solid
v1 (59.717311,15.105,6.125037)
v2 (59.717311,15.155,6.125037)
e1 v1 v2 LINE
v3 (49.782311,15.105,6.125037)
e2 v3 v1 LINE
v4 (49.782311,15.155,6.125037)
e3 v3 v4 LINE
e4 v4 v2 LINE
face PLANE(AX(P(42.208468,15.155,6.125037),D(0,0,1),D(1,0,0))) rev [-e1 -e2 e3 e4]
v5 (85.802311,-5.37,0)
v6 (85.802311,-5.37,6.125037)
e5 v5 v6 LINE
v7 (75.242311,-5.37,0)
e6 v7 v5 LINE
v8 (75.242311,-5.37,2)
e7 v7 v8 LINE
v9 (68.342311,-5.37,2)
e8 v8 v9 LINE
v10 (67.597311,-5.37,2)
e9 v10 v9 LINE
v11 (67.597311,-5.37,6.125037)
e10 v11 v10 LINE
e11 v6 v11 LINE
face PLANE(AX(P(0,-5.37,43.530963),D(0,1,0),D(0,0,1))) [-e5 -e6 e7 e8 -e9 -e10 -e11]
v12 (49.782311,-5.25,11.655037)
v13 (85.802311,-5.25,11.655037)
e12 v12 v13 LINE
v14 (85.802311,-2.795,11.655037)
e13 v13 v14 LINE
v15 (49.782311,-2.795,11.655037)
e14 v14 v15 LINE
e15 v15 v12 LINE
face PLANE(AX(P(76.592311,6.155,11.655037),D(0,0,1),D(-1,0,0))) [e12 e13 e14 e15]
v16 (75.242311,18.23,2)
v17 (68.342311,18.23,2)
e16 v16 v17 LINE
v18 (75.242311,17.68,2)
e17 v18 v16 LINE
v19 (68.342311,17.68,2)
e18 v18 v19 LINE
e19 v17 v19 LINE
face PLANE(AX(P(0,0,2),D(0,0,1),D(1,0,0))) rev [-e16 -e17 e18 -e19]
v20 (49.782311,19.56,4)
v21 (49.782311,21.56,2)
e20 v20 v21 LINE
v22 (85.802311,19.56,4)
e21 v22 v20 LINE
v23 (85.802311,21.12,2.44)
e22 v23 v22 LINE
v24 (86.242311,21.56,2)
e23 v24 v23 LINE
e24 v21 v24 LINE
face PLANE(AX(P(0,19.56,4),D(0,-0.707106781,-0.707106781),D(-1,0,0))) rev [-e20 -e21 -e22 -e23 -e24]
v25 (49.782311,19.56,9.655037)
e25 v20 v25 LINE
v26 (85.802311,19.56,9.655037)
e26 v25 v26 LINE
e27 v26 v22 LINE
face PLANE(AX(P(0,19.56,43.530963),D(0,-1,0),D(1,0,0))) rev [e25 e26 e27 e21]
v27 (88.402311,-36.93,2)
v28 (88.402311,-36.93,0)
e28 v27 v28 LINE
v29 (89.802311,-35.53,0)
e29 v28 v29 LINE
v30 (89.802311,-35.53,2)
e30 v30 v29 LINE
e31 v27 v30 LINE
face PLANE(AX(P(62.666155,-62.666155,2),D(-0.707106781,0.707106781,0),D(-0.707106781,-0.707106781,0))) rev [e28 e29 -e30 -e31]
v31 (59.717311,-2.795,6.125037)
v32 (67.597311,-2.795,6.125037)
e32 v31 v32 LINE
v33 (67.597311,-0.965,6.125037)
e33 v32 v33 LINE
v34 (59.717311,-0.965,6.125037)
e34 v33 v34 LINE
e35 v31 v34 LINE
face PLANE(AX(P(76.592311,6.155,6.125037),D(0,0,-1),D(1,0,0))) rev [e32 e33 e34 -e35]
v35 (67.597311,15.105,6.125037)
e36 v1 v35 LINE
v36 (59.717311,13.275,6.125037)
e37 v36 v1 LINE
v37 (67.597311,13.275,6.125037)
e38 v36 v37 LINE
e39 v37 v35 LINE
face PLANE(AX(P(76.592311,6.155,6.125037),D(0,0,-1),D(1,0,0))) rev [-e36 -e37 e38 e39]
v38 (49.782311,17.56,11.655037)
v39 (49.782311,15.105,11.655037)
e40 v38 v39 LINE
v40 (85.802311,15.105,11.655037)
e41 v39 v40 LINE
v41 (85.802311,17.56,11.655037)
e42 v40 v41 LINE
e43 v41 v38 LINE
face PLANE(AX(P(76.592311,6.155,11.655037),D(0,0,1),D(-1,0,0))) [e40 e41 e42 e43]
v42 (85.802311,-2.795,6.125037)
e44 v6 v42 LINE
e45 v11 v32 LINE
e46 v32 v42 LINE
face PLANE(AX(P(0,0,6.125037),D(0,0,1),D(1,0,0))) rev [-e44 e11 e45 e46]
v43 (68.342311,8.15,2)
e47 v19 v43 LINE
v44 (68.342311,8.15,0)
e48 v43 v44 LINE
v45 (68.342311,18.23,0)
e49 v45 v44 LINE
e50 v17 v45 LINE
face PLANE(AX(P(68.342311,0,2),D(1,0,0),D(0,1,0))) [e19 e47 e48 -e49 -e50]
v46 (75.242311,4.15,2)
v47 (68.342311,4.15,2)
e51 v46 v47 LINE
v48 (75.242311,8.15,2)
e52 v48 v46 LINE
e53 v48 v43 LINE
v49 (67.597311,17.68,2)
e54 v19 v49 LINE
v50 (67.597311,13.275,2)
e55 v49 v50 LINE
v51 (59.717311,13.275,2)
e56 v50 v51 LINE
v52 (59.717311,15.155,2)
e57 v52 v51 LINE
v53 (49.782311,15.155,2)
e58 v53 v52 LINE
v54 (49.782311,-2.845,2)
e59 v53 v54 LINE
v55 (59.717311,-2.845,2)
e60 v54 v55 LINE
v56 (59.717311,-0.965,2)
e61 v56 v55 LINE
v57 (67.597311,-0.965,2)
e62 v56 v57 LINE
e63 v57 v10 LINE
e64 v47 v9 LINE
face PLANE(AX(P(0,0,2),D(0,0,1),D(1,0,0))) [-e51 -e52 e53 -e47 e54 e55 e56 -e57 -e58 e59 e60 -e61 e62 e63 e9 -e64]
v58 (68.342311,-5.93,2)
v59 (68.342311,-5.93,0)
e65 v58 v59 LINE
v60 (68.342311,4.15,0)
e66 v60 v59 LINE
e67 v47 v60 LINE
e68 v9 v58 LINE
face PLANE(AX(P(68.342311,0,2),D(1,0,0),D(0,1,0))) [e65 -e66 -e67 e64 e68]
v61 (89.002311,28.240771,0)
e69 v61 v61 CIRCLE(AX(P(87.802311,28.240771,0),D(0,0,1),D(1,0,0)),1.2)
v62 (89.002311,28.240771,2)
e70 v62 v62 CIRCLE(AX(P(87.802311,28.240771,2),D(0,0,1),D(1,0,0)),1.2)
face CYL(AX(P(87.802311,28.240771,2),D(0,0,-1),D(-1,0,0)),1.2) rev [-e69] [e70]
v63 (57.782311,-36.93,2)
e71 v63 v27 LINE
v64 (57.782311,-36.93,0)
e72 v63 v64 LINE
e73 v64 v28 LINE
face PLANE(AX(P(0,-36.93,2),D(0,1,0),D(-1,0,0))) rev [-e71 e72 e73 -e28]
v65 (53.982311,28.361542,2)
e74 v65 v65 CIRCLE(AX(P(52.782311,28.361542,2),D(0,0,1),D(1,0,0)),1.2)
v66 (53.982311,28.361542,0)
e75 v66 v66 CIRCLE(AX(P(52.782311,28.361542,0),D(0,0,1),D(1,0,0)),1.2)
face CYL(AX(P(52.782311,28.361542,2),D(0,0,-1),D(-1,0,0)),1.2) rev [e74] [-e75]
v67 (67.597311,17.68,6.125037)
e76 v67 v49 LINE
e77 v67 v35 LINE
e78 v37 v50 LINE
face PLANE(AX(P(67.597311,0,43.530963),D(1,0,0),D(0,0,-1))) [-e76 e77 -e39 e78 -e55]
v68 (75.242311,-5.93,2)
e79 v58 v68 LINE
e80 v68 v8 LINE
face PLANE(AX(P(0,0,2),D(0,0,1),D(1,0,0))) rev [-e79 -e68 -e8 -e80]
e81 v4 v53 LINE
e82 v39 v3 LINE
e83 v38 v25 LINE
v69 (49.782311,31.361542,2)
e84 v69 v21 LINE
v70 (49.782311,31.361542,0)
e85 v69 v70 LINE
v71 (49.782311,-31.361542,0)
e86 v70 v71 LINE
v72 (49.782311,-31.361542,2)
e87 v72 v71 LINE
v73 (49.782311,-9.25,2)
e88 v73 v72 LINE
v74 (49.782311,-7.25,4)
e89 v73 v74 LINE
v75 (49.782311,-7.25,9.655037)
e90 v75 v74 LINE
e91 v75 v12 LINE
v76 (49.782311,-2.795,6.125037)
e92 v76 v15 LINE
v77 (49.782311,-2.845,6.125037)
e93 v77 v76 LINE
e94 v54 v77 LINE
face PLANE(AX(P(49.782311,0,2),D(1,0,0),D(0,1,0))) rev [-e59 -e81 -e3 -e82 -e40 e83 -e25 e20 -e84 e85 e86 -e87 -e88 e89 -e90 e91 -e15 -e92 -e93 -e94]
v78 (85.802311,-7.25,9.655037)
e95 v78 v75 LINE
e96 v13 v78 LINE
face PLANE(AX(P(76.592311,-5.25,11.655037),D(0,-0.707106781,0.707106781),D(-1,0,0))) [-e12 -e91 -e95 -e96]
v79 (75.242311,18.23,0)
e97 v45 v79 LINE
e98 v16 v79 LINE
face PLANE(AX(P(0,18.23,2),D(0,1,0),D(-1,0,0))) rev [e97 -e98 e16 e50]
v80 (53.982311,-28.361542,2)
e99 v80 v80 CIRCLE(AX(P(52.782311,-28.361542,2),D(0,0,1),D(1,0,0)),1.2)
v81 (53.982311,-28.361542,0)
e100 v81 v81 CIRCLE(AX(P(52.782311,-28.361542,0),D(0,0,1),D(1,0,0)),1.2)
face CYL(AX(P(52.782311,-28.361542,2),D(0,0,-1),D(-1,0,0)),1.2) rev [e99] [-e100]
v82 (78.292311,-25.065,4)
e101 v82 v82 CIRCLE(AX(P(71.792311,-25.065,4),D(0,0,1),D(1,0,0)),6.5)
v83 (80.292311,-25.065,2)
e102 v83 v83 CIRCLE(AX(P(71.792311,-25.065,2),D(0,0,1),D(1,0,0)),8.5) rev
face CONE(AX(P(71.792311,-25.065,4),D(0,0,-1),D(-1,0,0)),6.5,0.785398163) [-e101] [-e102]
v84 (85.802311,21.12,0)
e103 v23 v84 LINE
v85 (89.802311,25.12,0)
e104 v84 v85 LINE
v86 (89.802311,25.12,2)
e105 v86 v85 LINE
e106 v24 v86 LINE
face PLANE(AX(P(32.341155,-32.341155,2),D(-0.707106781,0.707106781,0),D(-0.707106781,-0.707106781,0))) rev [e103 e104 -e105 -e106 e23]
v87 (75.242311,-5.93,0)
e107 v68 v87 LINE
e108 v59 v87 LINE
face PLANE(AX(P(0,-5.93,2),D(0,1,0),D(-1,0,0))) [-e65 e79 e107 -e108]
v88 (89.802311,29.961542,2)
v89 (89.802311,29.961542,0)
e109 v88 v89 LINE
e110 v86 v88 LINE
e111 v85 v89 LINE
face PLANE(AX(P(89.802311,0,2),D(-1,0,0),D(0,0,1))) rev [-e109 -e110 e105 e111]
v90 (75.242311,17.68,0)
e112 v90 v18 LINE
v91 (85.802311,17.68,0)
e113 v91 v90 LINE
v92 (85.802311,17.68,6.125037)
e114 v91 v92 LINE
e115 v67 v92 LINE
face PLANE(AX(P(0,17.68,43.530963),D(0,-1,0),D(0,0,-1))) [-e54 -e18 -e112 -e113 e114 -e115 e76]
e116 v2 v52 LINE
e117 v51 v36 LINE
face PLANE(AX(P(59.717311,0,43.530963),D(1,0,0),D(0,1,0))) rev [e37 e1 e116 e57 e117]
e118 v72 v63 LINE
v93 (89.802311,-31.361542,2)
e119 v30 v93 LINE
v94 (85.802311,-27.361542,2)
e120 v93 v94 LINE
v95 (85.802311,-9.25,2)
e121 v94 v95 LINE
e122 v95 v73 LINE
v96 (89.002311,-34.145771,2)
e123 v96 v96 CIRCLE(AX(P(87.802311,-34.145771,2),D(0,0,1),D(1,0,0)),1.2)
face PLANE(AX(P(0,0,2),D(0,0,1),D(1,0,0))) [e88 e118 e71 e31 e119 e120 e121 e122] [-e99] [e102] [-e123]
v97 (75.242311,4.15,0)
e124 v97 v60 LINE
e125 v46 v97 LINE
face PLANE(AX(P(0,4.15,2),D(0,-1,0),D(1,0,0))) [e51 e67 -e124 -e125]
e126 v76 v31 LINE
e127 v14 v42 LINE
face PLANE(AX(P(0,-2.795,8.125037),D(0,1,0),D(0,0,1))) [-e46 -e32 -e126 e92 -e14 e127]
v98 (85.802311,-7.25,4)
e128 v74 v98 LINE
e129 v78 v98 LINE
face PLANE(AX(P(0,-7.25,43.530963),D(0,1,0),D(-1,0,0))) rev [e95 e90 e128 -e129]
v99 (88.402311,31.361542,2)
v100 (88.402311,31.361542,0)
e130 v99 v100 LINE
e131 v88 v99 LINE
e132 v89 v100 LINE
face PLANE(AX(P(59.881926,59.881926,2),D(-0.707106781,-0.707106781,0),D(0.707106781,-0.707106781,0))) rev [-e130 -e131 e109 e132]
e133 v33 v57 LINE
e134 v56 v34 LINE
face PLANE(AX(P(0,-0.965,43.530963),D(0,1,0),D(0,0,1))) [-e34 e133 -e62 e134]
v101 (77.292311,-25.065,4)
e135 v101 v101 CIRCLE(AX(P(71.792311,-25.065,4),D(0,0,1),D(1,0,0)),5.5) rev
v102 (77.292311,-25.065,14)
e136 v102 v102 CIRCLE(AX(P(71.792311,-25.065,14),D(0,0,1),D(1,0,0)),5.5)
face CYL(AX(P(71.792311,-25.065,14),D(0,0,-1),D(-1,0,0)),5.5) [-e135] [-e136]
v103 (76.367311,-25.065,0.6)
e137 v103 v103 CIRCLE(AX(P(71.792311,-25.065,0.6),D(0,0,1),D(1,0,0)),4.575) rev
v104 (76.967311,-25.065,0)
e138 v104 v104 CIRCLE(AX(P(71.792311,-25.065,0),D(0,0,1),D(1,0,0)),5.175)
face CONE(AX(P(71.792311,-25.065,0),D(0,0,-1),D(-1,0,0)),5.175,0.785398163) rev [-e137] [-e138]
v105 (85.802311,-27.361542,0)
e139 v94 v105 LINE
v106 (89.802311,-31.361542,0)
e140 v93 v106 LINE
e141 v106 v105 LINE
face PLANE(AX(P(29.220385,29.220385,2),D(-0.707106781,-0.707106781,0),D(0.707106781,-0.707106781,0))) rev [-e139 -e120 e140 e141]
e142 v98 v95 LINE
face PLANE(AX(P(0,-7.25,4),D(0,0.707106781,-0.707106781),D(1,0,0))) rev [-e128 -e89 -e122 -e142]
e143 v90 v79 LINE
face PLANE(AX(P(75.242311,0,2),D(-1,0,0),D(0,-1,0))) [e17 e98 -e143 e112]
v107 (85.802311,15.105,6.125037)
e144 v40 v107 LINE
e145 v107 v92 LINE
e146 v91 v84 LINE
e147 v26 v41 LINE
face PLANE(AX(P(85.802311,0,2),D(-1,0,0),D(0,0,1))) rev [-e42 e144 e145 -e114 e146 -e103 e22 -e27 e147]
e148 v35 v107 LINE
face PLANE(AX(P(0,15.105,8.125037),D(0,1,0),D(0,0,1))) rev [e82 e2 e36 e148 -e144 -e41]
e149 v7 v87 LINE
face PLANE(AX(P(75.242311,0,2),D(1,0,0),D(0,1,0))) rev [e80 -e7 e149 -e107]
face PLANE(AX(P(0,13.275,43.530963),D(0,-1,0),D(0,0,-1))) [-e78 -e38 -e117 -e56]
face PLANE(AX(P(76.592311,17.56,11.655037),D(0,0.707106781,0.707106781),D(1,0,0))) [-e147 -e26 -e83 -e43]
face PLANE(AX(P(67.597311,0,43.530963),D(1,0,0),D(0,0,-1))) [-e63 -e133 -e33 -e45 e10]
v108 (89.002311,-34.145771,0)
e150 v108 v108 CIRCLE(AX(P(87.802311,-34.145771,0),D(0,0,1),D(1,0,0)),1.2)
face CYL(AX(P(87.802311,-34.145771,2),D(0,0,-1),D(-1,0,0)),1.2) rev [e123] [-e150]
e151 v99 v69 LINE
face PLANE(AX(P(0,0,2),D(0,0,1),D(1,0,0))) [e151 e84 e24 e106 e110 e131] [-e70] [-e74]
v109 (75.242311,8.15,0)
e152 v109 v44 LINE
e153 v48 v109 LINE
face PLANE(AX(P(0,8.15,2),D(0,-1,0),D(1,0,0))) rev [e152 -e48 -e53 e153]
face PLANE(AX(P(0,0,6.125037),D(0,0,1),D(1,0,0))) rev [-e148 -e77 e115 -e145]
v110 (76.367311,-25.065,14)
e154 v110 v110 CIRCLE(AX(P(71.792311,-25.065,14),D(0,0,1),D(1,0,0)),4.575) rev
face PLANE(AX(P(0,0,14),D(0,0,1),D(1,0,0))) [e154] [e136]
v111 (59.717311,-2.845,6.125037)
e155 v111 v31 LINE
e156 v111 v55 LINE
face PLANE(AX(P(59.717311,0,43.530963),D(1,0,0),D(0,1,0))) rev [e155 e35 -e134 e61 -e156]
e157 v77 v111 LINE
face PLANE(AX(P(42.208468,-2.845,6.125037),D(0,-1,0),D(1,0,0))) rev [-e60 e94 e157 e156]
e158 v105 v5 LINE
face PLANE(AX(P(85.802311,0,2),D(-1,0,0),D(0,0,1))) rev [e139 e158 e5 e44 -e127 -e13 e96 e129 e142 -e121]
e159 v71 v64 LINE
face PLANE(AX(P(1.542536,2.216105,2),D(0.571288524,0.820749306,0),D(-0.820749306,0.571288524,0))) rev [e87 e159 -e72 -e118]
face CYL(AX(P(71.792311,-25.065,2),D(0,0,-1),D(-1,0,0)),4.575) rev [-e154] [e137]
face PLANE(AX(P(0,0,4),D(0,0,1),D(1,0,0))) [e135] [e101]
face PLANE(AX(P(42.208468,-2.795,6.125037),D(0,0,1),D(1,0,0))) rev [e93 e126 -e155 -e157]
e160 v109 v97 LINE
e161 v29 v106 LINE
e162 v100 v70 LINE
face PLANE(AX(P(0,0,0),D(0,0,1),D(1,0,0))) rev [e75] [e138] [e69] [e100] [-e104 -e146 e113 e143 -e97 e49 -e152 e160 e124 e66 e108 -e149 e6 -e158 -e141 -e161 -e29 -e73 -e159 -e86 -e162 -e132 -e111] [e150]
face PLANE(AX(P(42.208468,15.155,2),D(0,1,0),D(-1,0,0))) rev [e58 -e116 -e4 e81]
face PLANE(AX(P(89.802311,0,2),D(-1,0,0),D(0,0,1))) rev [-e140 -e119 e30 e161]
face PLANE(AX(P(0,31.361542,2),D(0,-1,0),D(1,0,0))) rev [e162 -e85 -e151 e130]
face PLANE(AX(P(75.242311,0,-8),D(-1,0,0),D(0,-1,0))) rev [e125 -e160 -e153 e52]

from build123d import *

# Parameters (mm, degrees)
SKETCH_1_R          = 4.575
SKETCH_1_W          = 6.9
SKETCH_1_H          = 10.08
SKETCH_1_R_2        = 1.2
EXTRUDE_1_DEPTH     = 2
EXTRUDE_2_DEPTH     = 4.125036756
SKETCH_3_W          = 1.88
SKETCH_3_H          = 14.24
CUT_EXTRUDE_1_DEPTH = 4.125036756
SKETCH_4_W          = 6.9
SKETCH_4_H          = 0.56
SKETCH_4_H_2        = 0.55
EXTRUDE_3_DEPTH     = 4.125036756
SKETCH_5_W          = 0.215
SKETCH_5_H          = 23.05
CUT_EXTRUDE_2_DEPTH = 4.125036756
SKETCH_6_W          = 0.745
SKETCH_6_H          = 2.575
SKETCH_6_W_2        = 6.9
EXTRUDE_4_DEPTH     = 2
SKETCH_7_R          = 5.5
SKETCH_7_R_2        = 4.575
EXTRUDE_5_DEPTH     = 12
CHAMFER_1_SIZE      = 0.6
SKETCH_8_R          = 6.5
SKETCH_8_R_2        = 5.5
EXTRUDE_6_DEPTH     = 2
EXTRUDE_7_DEPTH     = 15.935
SKETCH_10_W         = 36.02
SKETCH_10_H         = 4.455
EXTRUDE_8_DEPTH     = 3.53
CHAMFER_3_SIZE      = 2
CHAMFER_4_SIZE      = 2
CUT_EXTRUDE_4_DEPTH = 10


with BuildPart() as part:
    # 草图1 → 凸台-拉伸1 (new body)
    # profile 1 of 2: a face of its own
    with BuildSketch(Plane.XY):
        Polygon((83.862310964, 7.15), (85.802310964, 7.15), (85.802310964, 13.83), (83.862310964, 13.83), (83.862310964, 25.12), (77.212310964, 25.12), (77.212310964, 30), (66.372310964, 30), (66.372310964, 25.12), (59.662310964, 25.12), (59.662310964, 25.076338502), (59.782310964, 25), (59.782310964, -34.93), (83.862310964, -34.93), align=None)
        with Locations((71.792310964, -25.065)):
            Circle(SKETCH_1_R, mode=Mode.SUBTRACT)
        with Locations((71.792310964, -0.89)):
            Rectangle(SKETCH_1_W, SKETCH_1_H, mode=Mode.SUBTRACT)
        with Locations((71.792310964, 13.19)):
            Rectangle(SKETCH_1_W, SKETCH_1_H, mode=Mode.SUBTRACT)
    # profile 2 of 2: a face of its own
    with BuildSketch(Plane.XY):
        Polygon((85.802310964, -27.361541817), (85.802310964, 7.15), (83.862310964, 7.15), (83.862310964, -34.93), (59.782310964, -34.93), (59.782310964, 25), (59.662310964, 25.076338502), (59.662310964, 25.12), (66.372310964, 25.12), (66.372310964, 30), (77.212310964, 30), (77.212310964, 25.12), (83.862310964, 25.12), (83.862310964, 13.83), (85.802310964, 13.83), (85.802310964, 21.12), (89.802310964, 25.12), (89.802310964, 29.961541817), (88.402310964, 31.361541817), (49.782310964, 31.361541817), (49.782310964, -31.361541817), (57.782310964, -36.93), (88.402310964, -36.93), (89.802310964, -35.53), (89.802310964, -31.361541817), align=None)
        with Locations((52.782310964, -28.361541817)):
            Circle(SKETCH_1_R_2, mode=Mode.SUBTRACT)
        with Locations((87.802310964, -34.145770908)):
            Circle(SKETCH_1_R_2, mode=Mode.SUBTRACT)
        with Locations((52.782310964, 28.361541817)):
            Circle(SKETCH_1_R_2, mode=Mode.SUBTRACT)
        with Locations((87.802310964, 28.240770908)):
            Circle(SKETCH_1_R_2, mode=Mode.SUBTRACT)
    extrude(amount=EXTRUDE_1_DEPTH)

    # 草图2 → 凸台-拉伸2 (add)
    with BuildSketch(Plane.XY.offset(2)):
        Polygon((79.187310964, 17.68), (79.187310964, 19.56), (65.717310964, 19.56), (65.717310964, 15.155), (59.717310964, 15.155), (59.717310964, -2.845), (65.717310964, -2.845), (65.717310964, -7.25), (79.187310964, -7.25), (79.187310964, -5.37), (75.242310964, -5.37), (75.242310964, -5.93), (68.342310964, -5.93), (68.342310964, -5.37), (67.597310964, -5.37), (67.597310964, -0.965), (61.597310964, -0.965), (61.597310964, 13.275), (67.597310964, 13.275), (67.597310964, 17.68), (68.342310964, 17.68), (68.342310964, 18.23), (75.242310964, 18.23), (75.242310964, 17.68), align=None)
        Polygon((83.187310964, 17.68), (83.187310964, 19.56), (79.187310964, 19.56), (79.187310964, 17.68), (81.067310964, 17.68), (81.307310964, 17.68), align=None)
        Polygon((85.802310964, 19.56), (83.187310964, 19.56), (83.187310964, 17.68), (85.587310964, 17.68), (85.587310964, -5.37), (83.187310964, -5.37), (83.187310964, -7.25), (85.802310964, -7.25), align=None)
        Polygon((79.187310964, -7.25), (83.187310964, -7.25), (83.187310964, -5.37), (81.307310964, -5.37), (81.067310964, -5.37), (79.187310964, -5.37), align=None)
    extrude(amount=EXTRUDE_2_DEPTH)

    # 草图3 → 切除-拉伸1 (cut)
    with BuildSketch(Plane.XY.offset(6.125036756)):
        with Locations((60.657310964, 6.155)):
            Rectangle(SKETCH_3_W, SKETCH_3_H)
    extrude(amount=-CUT_EXTRUDE_1_DEPTH, mode=Mode.SUBTRACT)

    # 草图4 → 凸台-拉伸3 (add)
    with BuildSketch(Plane.XY.offset(6.125036756)):
        with Locations((71.792310964, -5.65)):
            Rectangle(SKETCH_4_W, SKETCH_4_H)
        with Locations((71.792310964, 17.955)):
            Rectangle(SKETCH_4_W, SKETCH_4_H_2)
    extrude(amount=-EXTRUDE_3_DEPTH)

    # 草图5 → 切除-拉伸2 (cut)
    with BuildSketch(Plane.XY.offset(6.125036756)):
        with Locations((85.694810964, 6.155)):
            Rectangle(SKETCH_5_W, SKETCH_5_H)
    extrude(amount=-CUT_EXTRUDE_2_DEPTH, mode=Mode.SUBTRACT)

    # 草图6 → 凸台-拉伸4 (add)
    with BuildSketch(Plane.XY.offset(6.125036756)):
        Polygon((67.597310964, -5.37), (67.597310964, -2.795), (65.717310964, -2.795), (65.717310964, -2.845), (65.717310964, -7.25), (67.597310964, -7.25), align=None)
        Polygon((85.802310964, -5.37), (75.242310964, -5.37), (68.342310964, -5.37), (67.597310964, -5.37), (67.597310964, -7.25), (85.802310964, -7.25), align=None)
        with Locations((67.969810964, -4.0825)):
            Rectangle(SKETCH_6_W, SKETCH_6_H)
        with Locations((71.792310964, -4.0825)):
            Rectangle(SKETCH_6_W_2, SKETCH_6_H)
        Polygon((85.467310964, -2.795), (81.187310964, -2.795), (75.242310964, -2.795), (75.242310964, -5.37), (85.802310964, -5.37), (85.802310964, -2.795), align=None)
        Polygon((65.717310964, 15.105), (67.597310964, 15.105), (67.597310964, 17.68), (67.597310964, 19.56), (65.717310964, 19.56), (65.717310964, 15.155), align=None)
        Polygon((68.342310964, 17.68), (75.242310964, 17.68), (85.802310964, 17.68), (85.802310964, 19.56), (67.597310964, 19.56), (67.597310964, 17.68), align=None)
        with Locations((67.969810964, 16.3925)):
            Rectangle(SKETCH_6_W, SKETCH_6_H)
        with Locations((71.792310964, 16.3925)):
            Rectangle(SKETCH_6_W_2, SKETCH_6_H)
        Polygon((75.242310964, 15.105), (81.187310964, 15.105), (85.467310964, 15.105), (85.802310964, 15.105), (85.802310964, 17.68), (75.242310964, 17.68), align=None)
    extrude(amount=EXTRUDE_4_DEPTH)

    # 草图7 → 凸台-拉伸5 (add)
    with BuildSketch(Plane.XY.offset(2)):
        with Locations((71.792310964, -25.065)):
            Circle(SKETCH_7_R)
        with Locations((71.792310964, -25.065)):
            Circle(SKETCH_7_R_2, mode=Mode.SUBTRACT)
    extrude(amount=EXTRUDE_5_DEPTH)

    # 倒角1
    chamfer_1_edges = [part.edges().sort_by_distance(p)[0] for p in [
        (67.217310964, -25.065, 0),
    ]]
    chamfer(chamfer_1_edges, length=CHAMFER_1_SIZE)

    # 草图8 → 凸台-拉伸6 (add)
    with BuildSketch(Plane.XY.offset(2)):
        with Locations((71.792310964, -25.065)):
            Circle(SKETCH_8_R)
        with Locations((71.792310964, -25.065)):
            Circle(SKETCH_8_R_2, mode=Mode.SUBTRACT)
    extrude(amount=EXTRUDE_6_DEPTH)

    # 草图9 → 凸台-拉伸7 (add)
    with BuildSketch(Plane.ZY.offset(-65.717310964)):
        Polygon((2, -7.25), (8.125036756, -7.25), (8.125036756, -2.795), (6.125036756, -2.795), (6.125036756, -2.845), (2, -2.845), align=None)
        Polygon((2, 15.155), (6.125036756, 15.155), (6.125036756, 15.105), (8.125036756, 15.105), (8.125036756, 19.56), (2, 19.56), align=None)
    extrude(amount=EXTRUDE_7_DEPTH)

    # 草图10 → 凸台-拉伸8 (add)
    with BuildSketch(Plane.XY.offset(8.125036756)):
        with Locations((67.792310964, -5.0225)):
            Rectangle(SKETCH_10_W, SKETCH_10_H)
        with Locations((67.792310964, 17.3325)):
            Rectangle(SKETCH_10_W, SKETCH_10_H)
    extrude(amount=EXTRUDE_8_DEPTH)

    # 倒角3
    chamfer_3_edges = [part.edges().sort_by_distance(p)[0] for p in [
        (67.792310964, 19.56, 11.655036756),
        (67.792310964, -7.25, 11.655036756),
        (67.792310964, 19.56, 2),
        (67.792310964, -7.25, 2),
    ]]
    chamfer(chamfer_3_edges, length=CHAMFER_3_SIZE)

    # 倒角4
    chamfer_4_edges = [part.edges().sort_by_distance(p)[0] for p in [
        (65.292310964, -25.065, 2),
    ]]
    chamfer(chamfer_4_edges, length=CHAMFER_4_SIZE - 0.0001)  # a hair under: the kernel refuses the full size

    # 草图12 → 切除-拉伸4 (cut)
    with BuildSketch(Plane.XY.offset(2)):
        Polygon((75.242310964, 8.15), (75.242310964, 4.15), (75.242310964, -5.37), (85.802310964, -5.37), (85.802310964, 17.68), (75.242310964, 17.68), align=None)
    extrude(amount=-CUT_EXTRUDE_4_DEPTH, mode=Mode.SUBTRACT)


solid = part.part
